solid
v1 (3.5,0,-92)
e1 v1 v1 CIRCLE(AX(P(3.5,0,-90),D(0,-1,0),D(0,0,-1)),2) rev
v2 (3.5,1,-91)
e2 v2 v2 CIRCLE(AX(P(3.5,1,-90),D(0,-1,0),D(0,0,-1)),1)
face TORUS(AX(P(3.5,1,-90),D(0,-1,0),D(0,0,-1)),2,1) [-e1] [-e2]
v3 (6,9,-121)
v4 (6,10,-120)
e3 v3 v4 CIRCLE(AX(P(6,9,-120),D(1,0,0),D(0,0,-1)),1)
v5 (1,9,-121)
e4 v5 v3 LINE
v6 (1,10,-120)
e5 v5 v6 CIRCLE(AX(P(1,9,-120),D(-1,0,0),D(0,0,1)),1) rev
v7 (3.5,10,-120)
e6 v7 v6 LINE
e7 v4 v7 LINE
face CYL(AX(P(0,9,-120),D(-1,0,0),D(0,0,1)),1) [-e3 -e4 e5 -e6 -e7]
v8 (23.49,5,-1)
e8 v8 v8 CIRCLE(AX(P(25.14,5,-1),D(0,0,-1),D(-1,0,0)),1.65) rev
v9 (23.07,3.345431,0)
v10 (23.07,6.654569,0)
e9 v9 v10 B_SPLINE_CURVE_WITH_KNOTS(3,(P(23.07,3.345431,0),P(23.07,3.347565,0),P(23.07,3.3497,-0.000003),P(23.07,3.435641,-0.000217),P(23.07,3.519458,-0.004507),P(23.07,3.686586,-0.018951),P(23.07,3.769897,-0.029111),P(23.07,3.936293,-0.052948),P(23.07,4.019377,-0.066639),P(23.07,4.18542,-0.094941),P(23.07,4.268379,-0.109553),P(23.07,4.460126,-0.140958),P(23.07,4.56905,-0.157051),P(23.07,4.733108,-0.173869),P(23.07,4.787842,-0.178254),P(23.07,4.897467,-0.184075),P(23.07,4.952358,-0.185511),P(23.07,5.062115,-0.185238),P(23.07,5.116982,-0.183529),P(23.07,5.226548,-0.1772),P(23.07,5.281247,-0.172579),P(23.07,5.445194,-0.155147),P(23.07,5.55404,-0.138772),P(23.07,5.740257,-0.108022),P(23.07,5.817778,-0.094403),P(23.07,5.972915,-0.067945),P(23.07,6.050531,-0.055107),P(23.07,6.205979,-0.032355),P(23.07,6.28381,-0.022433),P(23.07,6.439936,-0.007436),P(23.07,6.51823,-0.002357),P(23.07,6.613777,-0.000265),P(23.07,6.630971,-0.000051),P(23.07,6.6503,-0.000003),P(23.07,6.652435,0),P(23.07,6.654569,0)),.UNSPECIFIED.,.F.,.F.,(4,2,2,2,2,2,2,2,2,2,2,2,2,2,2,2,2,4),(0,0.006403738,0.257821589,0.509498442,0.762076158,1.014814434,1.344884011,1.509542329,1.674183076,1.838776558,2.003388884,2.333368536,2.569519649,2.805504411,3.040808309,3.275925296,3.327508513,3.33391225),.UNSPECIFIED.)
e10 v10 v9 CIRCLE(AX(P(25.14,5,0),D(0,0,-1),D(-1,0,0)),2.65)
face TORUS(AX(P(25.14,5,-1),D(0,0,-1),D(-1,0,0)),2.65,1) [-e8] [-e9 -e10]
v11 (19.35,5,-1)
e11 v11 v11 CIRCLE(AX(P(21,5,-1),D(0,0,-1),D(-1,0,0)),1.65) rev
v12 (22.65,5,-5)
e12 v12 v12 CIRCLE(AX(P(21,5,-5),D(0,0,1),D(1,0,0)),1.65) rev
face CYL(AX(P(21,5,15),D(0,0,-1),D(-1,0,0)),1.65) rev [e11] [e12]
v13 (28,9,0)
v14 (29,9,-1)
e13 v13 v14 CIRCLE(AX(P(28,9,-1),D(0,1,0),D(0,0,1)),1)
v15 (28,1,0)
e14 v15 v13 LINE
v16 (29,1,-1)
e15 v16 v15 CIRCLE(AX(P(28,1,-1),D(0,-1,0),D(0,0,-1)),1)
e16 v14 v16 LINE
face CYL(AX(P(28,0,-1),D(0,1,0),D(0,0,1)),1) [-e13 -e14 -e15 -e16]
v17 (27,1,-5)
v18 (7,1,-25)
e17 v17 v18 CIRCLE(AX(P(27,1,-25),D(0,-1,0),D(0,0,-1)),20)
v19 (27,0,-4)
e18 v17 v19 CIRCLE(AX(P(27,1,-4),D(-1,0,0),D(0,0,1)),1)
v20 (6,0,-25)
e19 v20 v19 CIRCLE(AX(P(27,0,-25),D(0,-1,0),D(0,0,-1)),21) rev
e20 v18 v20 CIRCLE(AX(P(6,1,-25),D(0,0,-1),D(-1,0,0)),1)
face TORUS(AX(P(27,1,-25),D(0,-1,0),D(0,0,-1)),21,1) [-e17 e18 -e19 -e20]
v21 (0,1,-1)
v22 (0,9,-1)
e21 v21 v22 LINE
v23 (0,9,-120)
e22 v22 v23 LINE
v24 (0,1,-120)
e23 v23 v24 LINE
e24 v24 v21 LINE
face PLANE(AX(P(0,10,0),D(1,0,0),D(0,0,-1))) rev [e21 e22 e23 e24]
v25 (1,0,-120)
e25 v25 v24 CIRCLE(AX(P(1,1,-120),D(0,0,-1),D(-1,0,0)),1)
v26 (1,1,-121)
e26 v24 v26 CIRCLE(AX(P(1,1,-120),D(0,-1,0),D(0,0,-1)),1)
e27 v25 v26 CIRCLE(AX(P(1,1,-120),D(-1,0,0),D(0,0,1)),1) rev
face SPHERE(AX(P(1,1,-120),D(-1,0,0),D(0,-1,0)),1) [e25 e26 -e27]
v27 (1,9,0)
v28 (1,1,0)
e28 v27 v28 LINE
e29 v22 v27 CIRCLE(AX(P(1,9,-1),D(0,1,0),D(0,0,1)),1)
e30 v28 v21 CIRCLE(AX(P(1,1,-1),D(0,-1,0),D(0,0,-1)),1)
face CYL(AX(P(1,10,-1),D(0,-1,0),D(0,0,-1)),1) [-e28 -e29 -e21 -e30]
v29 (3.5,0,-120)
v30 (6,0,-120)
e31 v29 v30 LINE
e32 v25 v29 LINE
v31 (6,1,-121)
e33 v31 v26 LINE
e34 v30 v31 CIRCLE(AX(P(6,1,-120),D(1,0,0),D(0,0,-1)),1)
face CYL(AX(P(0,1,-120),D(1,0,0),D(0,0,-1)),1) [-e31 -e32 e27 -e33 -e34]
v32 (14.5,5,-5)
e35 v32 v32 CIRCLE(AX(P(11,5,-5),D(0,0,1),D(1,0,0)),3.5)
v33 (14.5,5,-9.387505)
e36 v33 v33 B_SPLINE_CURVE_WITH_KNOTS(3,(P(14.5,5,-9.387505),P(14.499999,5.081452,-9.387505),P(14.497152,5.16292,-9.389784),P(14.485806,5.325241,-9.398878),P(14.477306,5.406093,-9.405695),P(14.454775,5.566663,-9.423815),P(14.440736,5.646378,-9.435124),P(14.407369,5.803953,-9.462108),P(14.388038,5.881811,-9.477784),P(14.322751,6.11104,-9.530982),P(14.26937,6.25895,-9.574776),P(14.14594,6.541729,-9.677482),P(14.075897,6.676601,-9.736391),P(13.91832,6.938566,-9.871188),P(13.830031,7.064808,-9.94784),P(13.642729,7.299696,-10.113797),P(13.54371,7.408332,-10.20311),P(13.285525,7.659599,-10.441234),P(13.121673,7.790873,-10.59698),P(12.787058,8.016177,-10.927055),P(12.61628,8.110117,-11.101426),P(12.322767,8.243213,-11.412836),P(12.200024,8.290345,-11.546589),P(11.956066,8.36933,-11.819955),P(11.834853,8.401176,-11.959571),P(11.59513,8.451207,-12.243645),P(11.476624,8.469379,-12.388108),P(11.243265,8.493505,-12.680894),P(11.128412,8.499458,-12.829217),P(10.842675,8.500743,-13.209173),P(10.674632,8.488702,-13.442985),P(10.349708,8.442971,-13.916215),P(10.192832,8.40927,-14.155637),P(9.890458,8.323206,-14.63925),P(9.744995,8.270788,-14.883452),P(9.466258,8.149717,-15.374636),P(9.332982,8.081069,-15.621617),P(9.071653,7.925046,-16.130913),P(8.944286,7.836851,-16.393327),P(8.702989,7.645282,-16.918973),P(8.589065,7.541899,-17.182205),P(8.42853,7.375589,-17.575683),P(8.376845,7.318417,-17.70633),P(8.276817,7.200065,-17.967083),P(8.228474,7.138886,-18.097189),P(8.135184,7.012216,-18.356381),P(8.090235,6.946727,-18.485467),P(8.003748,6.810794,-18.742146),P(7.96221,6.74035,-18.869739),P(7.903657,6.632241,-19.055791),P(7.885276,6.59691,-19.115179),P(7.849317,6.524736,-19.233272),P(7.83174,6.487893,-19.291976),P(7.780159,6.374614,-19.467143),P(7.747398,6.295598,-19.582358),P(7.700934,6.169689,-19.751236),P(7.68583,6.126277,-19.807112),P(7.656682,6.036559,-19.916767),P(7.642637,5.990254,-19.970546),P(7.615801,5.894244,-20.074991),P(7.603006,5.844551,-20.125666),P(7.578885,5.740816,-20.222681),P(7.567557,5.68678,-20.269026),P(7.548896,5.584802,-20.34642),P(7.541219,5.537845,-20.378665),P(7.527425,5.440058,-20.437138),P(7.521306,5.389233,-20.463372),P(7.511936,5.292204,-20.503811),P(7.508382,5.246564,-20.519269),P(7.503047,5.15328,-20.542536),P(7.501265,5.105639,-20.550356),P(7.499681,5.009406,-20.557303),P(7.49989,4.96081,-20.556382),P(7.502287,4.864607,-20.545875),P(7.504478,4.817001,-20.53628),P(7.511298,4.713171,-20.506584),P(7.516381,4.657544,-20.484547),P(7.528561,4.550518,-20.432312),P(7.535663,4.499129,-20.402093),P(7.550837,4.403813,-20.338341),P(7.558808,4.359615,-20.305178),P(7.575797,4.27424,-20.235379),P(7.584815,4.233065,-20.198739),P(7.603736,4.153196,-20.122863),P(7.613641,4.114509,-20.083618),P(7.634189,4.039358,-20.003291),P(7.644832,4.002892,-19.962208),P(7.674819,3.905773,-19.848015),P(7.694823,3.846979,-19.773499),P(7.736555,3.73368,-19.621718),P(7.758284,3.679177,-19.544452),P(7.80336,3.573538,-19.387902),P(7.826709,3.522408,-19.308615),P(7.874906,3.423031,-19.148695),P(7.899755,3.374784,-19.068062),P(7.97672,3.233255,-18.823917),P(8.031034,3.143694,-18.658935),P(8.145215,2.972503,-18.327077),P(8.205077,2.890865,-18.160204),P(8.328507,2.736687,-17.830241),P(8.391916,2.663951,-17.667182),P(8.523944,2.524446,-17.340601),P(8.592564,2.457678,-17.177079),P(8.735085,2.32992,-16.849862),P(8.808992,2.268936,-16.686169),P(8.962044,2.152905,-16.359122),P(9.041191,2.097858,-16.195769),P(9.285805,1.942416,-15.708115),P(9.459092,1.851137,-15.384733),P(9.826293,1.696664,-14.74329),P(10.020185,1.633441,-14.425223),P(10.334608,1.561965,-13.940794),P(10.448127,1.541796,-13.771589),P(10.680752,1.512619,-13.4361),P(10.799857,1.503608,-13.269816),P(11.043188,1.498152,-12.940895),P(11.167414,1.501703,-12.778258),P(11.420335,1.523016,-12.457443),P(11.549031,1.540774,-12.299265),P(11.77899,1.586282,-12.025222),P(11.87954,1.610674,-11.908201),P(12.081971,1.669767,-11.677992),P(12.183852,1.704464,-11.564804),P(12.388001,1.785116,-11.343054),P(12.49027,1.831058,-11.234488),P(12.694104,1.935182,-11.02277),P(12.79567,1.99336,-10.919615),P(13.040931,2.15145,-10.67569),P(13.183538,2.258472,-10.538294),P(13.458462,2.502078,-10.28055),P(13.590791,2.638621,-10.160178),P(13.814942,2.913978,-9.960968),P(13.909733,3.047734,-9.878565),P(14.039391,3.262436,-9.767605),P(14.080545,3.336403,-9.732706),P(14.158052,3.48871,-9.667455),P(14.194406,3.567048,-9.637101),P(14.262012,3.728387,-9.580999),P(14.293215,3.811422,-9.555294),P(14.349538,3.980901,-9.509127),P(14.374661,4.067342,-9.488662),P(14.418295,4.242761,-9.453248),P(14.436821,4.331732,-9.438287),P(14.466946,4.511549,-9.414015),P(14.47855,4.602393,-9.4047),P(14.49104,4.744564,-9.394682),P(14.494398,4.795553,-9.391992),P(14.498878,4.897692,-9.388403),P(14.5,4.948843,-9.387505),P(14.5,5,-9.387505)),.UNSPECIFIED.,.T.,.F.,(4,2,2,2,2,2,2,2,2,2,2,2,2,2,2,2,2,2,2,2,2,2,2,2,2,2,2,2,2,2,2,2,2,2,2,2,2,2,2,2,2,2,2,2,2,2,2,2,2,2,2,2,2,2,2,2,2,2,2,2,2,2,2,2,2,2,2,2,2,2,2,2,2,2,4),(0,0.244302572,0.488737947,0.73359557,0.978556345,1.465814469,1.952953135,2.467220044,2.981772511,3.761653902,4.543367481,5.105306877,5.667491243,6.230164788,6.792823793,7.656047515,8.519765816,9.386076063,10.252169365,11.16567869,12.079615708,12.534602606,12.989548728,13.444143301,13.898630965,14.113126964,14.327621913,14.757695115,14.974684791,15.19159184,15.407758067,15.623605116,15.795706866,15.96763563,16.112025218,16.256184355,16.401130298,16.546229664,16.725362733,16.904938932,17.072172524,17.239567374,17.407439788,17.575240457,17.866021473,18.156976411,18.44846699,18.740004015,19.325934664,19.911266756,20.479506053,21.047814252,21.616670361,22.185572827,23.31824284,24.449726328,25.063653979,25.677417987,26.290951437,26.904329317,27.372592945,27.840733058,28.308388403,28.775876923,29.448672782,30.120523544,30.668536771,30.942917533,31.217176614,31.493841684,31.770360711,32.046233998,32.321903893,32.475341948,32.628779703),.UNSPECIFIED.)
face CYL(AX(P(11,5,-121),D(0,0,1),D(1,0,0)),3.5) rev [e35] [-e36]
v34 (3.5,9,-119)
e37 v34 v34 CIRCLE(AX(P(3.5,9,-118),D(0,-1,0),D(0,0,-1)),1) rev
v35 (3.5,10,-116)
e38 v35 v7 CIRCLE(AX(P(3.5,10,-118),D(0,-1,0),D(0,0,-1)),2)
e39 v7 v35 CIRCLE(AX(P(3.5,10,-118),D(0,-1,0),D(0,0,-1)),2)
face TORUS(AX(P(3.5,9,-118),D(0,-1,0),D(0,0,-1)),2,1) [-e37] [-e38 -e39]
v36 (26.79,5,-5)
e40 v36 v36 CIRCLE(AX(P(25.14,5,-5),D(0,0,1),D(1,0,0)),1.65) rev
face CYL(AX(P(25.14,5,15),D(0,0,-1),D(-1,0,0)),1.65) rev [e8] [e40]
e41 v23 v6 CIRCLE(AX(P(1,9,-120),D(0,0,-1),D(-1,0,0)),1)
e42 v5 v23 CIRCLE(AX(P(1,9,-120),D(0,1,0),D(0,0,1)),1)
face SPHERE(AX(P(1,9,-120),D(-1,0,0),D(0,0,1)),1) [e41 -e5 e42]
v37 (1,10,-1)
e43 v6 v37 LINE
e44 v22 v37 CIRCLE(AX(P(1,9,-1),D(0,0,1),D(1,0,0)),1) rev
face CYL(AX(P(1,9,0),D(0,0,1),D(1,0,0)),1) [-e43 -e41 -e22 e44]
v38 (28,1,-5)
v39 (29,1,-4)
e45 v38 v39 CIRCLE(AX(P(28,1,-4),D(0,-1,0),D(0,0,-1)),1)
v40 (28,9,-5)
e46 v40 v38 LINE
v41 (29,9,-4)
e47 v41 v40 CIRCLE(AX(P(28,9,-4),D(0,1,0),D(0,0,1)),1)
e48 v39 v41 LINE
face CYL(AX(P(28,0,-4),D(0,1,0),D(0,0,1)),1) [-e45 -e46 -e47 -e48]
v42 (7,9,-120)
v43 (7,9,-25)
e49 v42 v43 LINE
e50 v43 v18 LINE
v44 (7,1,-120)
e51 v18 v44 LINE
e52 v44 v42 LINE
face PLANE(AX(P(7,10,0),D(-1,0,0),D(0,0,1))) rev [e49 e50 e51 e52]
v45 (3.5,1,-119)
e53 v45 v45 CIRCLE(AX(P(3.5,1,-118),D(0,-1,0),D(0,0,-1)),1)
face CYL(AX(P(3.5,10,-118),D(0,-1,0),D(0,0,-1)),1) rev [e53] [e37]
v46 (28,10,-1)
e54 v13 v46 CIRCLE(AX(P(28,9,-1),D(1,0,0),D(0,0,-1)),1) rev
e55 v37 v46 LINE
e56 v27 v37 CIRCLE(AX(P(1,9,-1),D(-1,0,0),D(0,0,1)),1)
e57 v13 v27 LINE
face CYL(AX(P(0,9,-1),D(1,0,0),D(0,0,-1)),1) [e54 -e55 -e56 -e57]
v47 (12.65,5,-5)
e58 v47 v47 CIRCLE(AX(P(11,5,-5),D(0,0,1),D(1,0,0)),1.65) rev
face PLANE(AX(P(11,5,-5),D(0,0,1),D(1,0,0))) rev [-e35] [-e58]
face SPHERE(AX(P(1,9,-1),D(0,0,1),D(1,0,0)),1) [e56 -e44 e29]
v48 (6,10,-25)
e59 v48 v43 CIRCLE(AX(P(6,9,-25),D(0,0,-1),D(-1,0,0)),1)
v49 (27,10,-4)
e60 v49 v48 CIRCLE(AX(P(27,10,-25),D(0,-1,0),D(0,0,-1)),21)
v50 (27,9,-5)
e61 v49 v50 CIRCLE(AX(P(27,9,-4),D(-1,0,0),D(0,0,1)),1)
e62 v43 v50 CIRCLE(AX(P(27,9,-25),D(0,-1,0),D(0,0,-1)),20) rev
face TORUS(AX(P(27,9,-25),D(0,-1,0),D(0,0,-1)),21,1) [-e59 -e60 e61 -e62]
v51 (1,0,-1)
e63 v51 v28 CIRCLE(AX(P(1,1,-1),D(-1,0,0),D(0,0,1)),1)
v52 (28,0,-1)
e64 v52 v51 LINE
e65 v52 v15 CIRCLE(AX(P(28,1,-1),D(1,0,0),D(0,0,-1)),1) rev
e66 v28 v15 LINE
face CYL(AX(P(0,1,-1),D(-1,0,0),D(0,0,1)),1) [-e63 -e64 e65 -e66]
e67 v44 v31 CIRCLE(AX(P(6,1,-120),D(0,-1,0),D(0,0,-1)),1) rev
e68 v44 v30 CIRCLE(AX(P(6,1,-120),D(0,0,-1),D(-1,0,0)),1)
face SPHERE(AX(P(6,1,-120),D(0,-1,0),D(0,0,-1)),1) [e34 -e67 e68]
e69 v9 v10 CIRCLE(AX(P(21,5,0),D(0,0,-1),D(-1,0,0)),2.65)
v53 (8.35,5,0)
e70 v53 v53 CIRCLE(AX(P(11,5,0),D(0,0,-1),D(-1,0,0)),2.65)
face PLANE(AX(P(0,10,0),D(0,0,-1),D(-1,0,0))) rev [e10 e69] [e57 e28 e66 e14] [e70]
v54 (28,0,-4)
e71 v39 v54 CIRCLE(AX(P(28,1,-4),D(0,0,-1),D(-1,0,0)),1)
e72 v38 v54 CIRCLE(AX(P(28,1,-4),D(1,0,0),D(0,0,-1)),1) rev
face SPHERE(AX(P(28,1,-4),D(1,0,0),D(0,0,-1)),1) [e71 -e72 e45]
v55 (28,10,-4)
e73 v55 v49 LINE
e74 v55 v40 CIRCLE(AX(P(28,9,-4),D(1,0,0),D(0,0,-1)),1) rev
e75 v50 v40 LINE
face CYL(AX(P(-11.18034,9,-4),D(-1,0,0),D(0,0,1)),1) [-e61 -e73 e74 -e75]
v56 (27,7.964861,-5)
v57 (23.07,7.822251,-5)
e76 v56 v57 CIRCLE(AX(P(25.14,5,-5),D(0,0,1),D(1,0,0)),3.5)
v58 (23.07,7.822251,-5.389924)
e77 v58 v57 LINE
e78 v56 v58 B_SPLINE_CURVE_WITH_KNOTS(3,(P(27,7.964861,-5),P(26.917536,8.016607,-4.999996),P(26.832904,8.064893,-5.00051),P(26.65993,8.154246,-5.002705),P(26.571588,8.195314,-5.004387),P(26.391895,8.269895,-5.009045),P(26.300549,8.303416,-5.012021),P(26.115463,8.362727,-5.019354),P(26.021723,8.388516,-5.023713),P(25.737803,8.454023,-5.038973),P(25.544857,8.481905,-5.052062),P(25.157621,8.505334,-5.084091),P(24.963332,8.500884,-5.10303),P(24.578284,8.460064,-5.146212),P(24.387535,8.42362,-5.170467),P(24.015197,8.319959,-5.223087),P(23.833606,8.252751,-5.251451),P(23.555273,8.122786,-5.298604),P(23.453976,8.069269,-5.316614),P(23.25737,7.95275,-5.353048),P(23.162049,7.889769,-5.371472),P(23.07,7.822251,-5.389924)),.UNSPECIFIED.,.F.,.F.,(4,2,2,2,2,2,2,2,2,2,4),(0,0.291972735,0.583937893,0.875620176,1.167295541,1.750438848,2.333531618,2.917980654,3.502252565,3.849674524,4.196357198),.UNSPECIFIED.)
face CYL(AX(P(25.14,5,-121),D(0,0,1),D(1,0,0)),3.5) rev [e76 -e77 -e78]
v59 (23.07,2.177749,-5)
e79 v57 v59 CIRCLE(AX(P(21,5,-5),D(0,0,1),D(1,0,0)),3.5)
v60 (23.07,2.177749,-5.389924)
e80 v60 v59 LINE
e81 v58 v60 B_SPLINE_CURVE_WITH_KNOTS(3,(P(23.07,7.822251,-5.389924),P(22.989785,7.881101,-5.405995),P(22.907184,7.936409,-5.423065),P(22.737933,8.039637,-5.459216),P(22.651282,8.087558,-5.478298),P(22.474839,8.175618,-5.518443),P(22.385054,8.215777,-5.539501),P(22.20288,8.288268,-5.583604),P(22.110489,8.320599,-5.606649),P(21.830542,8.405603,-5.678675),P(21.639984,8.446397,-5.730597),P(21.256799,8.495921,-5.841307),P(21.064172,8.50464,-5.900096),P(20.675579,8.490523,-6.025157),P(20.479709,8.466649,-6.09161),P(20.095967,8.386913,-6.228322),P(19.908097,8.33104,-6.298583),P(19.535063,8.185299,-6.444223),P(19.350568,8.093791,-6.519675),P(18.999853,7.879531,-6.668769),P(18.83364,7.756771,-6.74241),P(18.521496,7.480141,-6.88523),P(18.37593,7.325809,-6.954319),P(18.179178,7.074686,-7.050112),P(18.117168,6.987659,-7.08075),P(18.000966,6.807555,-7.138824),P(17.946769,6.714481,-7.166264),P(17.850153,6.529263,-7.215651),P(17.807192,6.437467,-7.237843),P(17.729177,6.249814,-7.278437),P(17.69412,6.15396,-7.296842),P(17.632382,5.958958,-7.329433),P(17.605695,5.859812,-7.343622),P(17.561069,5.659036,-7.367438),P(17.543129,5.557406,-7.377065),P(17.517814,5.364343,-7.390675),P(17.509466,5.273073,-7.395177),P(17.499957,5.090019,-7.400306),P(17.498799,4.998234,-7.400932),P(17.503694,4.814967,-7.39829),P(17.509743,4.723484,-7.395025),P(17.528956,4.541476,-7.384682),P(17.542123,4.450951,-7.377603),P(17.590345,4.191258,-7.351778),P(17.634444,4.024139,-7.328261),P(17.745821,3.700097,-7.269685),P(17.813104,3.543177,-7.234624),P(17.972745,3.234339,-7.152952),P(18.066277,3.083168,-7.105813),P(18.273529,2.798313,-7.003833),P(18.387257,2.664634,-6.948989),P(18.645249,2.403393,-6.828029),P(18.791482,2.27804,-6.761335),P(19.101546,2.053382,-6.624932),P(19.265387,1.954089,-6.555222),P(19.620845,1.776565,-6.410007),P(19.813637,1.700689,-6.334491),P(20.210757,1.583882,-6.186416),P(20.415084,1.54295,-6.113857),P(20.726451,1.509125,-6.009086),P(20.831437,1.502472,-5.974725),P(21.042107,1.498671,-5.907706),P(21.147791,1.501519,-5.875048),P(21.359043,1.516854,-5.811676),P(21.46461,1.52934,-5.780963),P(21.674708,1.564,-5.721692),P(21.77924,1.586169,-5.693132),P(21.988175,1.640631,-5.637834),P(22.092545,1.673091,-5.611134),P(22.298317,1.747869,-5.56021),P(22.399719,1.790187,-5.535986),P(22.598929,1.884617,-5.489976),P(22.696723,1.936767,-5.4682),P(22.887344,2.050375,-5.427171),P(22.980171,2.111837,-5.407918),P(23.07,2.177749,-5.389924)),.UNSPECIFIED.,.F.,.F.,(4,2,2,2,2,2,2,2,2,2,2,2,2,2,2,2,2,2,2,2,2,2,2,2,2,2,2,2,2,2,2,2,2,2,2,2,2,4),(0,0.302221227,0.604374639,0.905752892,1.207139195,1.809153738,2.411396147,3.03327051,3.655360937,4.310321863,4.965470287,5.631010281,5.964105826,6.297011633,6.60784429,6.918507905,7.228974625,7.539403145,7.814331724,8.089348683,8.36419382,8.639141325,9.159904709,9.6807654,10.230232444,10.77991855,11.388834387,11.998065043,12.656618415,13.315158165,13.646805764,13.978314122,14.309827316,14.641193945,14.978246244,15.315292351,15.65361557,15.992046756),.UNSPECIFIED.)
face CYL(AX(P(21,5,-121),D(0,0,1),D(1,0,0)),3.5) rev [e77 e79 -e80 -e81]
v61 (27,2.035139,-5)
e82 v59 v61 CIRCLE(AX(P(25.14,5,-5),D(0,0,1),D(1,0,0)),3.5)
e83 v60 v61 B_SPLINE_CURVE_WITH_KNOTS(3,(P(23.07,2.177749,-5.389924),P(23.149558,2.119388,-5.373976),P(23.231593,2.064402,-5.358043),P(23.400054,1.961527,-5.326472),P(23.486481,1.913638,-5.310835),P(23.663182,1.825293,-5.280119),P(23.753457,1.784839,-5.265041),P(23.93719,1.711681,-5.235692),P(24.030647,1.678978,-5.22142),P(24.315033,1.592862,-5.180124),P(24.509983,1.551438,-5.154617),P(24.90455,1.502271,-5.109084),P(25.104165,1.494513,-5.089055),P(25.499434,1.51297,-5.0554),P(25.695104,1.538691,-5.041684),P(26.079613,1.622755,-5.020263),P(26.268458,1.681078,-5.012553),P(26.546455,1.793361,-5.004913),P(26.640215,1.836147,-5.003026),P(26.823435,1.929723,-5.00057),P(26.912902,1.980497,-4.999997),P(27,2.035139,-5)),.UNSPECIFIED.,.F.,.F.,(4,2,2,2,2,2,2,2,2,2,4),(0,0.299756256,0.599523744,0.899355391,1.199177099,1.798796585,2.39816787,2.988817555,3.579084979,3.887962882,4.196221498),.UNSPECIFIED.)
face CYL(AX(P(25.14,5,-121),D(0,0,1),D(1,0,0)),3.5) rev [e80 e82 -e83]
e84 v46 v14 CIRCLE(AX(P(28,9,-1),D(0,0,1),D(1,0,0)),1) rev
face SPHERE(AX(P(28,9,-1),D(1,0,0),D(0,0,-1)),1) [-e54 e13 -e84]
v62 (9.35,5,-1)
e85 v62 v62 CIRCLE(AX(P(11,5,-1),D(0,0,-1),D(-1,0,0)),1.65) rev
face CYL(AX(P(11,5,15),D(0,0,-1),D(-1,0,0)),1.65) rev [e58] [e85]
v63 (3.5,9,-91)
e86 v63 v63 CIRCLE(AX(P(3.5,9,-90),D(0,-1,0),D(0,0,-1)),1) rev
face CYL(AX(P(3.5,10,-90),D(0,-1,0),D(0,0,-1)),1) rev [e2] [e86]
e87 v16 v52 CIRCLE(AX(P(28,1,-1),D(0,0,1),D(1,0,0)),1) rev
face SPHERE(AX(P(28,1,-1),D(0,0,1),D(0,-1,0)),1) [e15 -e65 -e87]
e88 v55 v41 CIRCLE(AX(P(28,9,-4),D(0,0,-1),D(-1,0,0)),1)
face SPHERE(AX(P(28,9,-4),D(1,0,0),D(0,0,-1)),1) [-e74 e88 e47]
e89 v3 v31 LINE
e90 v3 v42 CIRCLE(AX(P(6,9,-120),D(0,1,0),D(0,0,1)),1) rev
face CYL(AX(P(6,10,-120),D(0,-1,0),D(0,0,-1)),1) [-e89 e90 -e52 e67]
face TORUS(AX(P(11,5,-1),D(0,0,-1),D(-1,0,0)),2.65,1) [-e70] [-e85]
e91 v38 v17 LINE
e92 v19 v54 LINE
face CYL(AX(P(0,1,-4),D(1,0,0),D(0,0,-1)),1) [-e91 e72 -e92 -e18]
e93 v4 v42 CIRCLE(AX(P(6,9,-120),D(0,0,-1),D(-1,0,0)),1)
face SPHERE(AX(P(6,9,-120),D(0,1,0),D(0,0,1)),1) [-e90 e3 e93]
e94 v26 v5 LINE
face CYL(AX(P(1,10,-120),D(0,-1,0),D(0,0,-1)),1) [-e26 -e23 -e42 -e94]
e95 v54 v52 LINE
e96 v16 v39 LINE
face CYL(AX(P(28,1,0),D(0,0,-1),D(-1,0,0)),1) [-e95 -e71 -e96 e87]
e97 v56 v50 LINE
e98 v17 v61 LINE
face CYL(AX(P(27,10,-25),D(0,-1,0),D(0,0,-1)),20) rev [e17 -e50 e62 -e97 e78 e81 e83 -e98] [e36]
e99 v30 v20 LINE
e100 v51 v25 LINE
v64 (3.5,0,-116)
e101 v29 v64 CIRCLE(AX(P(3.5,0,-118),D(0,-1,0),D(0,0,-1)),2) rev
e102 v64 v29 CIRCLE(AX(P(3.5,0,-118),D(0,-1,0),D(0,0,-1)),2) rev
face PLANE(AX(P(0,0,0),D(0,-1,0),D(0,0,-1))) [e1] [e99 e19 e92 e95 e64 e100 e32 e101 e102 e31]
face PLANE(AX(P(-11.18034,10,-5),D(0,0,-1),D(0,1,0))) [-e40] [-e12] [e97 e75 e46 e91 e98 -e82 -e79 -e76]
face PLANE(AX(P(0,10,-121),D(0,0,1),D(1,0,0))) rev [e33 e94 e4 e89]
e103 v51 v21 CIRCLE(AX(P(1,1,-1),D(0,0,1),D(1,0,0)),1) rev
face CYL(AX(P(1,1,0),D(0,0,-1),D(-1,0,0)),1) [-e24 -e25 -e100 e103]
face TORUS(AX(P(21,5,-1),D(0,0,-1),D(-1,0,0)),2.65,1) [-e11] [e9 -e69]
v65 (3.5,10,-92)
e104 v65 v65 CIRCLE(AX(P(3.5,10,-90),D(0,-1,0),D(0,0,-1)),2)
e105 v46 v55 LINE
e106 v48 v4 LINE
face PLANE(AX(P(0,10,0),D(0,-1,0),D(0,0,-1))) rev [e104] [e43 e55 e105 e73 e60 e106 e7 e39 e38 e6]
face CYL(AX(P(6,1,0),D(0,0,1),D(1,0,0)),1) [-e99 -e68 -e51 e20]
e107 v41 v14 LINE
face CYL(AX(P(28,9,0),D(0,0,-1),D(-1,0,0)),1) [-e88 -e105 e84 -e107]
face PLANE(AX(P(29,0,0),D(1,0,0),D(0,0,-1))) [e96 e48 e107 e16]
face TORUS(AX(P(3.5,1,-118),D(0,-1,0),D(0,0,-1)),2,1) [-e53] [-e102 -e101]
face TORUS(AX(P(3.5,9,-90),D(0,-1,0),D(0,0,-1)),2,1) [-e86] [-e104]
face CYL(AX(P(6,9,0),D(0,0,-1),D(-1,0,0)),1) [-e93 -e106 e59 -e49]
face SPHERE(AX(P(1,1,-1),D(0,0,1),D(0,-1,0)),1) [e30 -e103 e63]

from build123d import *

# Parameters (mm, degrees)
SKETCH1_W                = 7
SKETCH1_H                = 121
SKETCH1_R                = 1
BOSS_EXTRUDE1_DEPTH      = 10
BOSS_EXTRUDE2_DEPTH      = 22
BOSS_EXTRUDE2_DEPTH_BACK = 7
SKETCH2_W                = 5
SKETCH2_H                = 10
SKETCH3_R                = 1.65
CUT_EXTRUDE1_DEPTH       = 20
FILLET1_R                = 20
FILLET2_R                = 1
SKETCH6_R                = 3.5
CUT_EXTRUDE3_DEPTH       = 120.987499349


with BuildPart() as part:
    # Sketch1 → Boss-Extrude1 (new body)
    with BuildSketch(Plane(origin=(0, 0, 0), x_dir=(1, 0, 0), z_dir=(0, 1, 0))):
        with Locations((3.5, 60.5)):
            Rectangle(SKETCH1_W, SKETCH1_H)
        with Locations(Location((3.5, 118, 0), (0, 0, 270))):
            Circle(SKETCH1_R, mode=Mode.SUBTRACT)
        with Locations(Location((3.5, 90, 0), (0, 0, 270))):
            Circle(SKETCH1_R, mode=Mode.SUBTRACT)
    extrude(amount=BOSS_EXTRUDE1_DEPTH)

    # Sketch2 → Boss-Extrude2 (add, two sides: drawn at the far end of the back side and taken through both)
    with BuildSketch(Plane(origin=(7, 0, 0), x_dir=(0, 0, -1), z_dir=(1, 0, 0)).offset(-BOSS_EXTRUDE2_DEPTH_BACK)):
        with Locations((2.5, 5)):
            Rectangle(SKETCH2_W, SKETCH2_H)
    extrude(amount=BOSS_EXTRUDE2_DEPTH + BOSS_EXTRUDE2_DEPTH_BACK)

    # Sketch3 → Cut-Extrude1 (cut)
    with BuildSketch(Plane(origin=(0, 0, -5), x_dir=(-1, 0, 0), z_dir=(0, 0, -1))):
        with Locations((-21, 5)):
            Circle(SKETCH3_R)
        with Locations((-11, 5)):
            Circle(SKETCH3_R)
        with Locations((-25.14, 5)):
            Circle(SKETCH3_R)
    extrude(amount=-CUT_EXTRUDE1_DEPTH, mode=Mode.SUBTRACT)

    # Fillet1
    # the kernel refuses this fillet: 20 mm, written as the material it adds along each edge
    with BuildSketch(Plane(origin=(7, 10, -5), x_dir=(1, 0, 0), z_dir=(0, -1, 0))) as fillet1_piece_1_section:
        with BuildLine():
            CenterArc((FILLET1_R, -FILLET1_R), FILLET1_R, 90, 90)
            Line((0, -FILLET1_R), (0, 0))
            Line((0, 0), (FILLET1_R, 0))
        make_face()
    fillet1_piece_1 = extrude(amount=10, mode=Mode.PRIVATE)
    fillet1_piece_1 = fillet1_piece_1 - Plane(origin=(11, 5, -10.788801803), x_dir=(-1, 0, 0), z_dir=(0, 0, -1)) * Cylinder(1.65, 100, mode=Mode.PRIVATE)
    fillet1_piece_1 = fillet1_piece_1 - Plane(origin=(21, 5, -10.788801803), x_dir=(-1, 0, 0), z_dir=(0, 0, -1)) * Cylinder(1.65, 100, mode=Mode.PRIVATE)
    fillet1_piece_1 = fillet1_piece_1 - Plane(origin=(25.14, 5, -10.788801803), x_dir=(-1, 0, 0), z_dir=(0, 0, -1)) * Cylinder(1.65, 100, mode=Mode.PRIVATE)
    add(fillet1_piece_1)

    # Fillet2
    # the kernel refuses this fillet: 1 mm, written as the material it takes off along each edge
    with BuildSketch(Plane(origin=(6, 9, -120), x_dir=(0, 1, 0), z_dir=(1, 0, 0))) as fillet2_piece_1_section:
        Polygon((0, 0), (FILLET2_R, 0), (FILLET2_R, -FILLET2_R), (0, -FILLET2_R), align=None)
    fillet2_piece_1 = extrude(amount=FILLET2_R, mode=Mode.PRIVATE)
    fillet2_piece_1 = fillet2_piece_1 - Plane(origin=(6, 9, -120), x_dir=(0, -0.7071067811865475, 0.7071067811865475), z_dir=(1, 0, 0)) * Sphere(FILLET2_R, mode=Mode.PRIVATE)
    add(fillet2_piece_1, mode=Mode.SUBTRACT)
    with BuildSketch(Plane(origin=(1, 9, -120), x_dir=(0, 1, 0), z_dir=(-1, 0, 0))) as fillet2_piece_2_section:
        Polygon((0, 0), (FILLET2_R, 0), (FILLET2_R, FILLET2_R), (0, FILLET2_R), align=None)
    fillet2_piece_2 = extrude(amount=FILLET2_R, mode=Mode.PRIVATE)
    fillet2_piece_2 = fillet2_piece_2 - Plane(origin=(1, 9, -120), x_dir=(0, -0.7071067811865475, 0.7071067811865475), z_dir=(-1, 0, 0)) * Sphere(FILLET2_R, mode=Mode.PRIVATE)
    add(fillet2_piece_2, mode=Mode.SUBTRACT)
    with BuildSketch(Plane(origin=(28, 1, -1), x_dir=(0, 0, 1), z_dir=(0, -1, 0))) as fillet2_piece_3_section:
        Polygon((0, 0), (FILLET2_R, 0), (FILLET2_R, -FILLET2_R), (0, -FILLET2_R), align=None)
    fillet2_piece_3 = extrude(amount=FILLET2_R, mode=Mode.PRIVATE)
    fillet2_piece_3 = fillet2_piece_3 - Plane(origin=(28, 1, -1), x_dir=(-0.7071067811865475, 0, -0.7071067811865476), z_dir=(0, -1, 0)) * Sphere(FILLET2_R, mode=Mode.PRIVATE)
    add(fillet2_piece_3, mode=Mode.SUBTRACT)
    with BuildSketch(Plane(origin=(28, 9, -1), x_dir=(1, 0, 0), z_dir=(0, 0, 1))) as fillet2_piece_4_section:
        Polygon((0, 0), (FILLET2_R, 0), (FILLET2_R, FILLET2_R), (0, FILLET2_R), align=None)
    fillet2_piece_4 = extrude(amount=FILLET2_R, mode=Mode.PRIVATE)
    fillet2_piece_4 = fillet2_piece_4 - Plane(origin=(28, 9, -1), x_dir=(-0.7071067811865475, -0.7071067811865475, 0), z_dir=(0, 0, 1)) * Sphere(FILLET2_R, mode=Mode.PRIVATE)
    add(fillet2_piece_4, mode=Mode.SUBTRACT)
    with BuildSketch(Plane(origin=(28, 1, -4), x_dir=(1, 0, 0), z_dir=(0, -1, 0))) as fillet2_piece_5_section:
        Polygon((0, 0), (FILLET2_R, 0), (FILLET2_R, -FILLET2_R), (0, -FILLET2_R), align=None)
    fillet2_piece_5 = extrude(amount=FILLET2_R, mode=Mode.PRIVATE)
    fillet2_piece_5 = fillet2_piece_5 - Plane(origin=(28, 1, -4), x_dir=(-0.7071067811865475, 0, 0.7071067811865475), z_dir=(0, -1, 0)) * Sphere(FILLET2_R, mode=Mode.PRIVATE)
    add(fillet2_piece_5, mode=Mode.SUBTRACT)
    with BuildSketch(Plane(origin=(28, 9, -4), x_dir=(0, 1, 0), z_dir=(1, 0, 0))) as fillet2_piece_6_section:
        Polygon((0, 0), (FILLET2_R, 0), (FILLET2_R, -FILLET2_R), (0, -FILLET2_R), align=None)
    fillet2_piece_6 = extrude(amount=FILLET2_R, mode=Mode.PRIVATE)
    fillet2_piece_6 = fillet2_piece_6 - Plane(origin=(28, 9, -4), x_dir=(0, -0.7071067811865477, 0.7071067811865475), z_dir=(1, 0, 0)) * Sphere(FILLET2_R, mode=Mode.PRIVATE)
    add(fillet2_piece_6, mode=Mode.SUBTRACT)
    with BuildSketch(Plane(origin=(1, 9, -1), x_dir=(-1, 0, 0), z_dir=(0, 0, 1))) as fillet2_piece_7_section:
        Polygon((0, 0), (FILLET2_R, 0), (FILLET2_R, -FILLET2_R), (0, -FILLET2_R), align=None)
    fillet2_piece_7 = extrude(amount=FILLET2_R, mode=Mode.PRIVATE)
    fillet2_piece_7 = fillet2_piece_7 - Plane(origin=(1, 9, -1), x_dir=(0.7071067811865475, -0.7071067811865475, 0), z_dir=(0, 0, 1)) * Sphere(FILLET2_R, mode=Mode.PRIVATE)
    add(fillet2_piece_7, mode=Mode.SUBTRACT)
    with BuildSketch(Plane(origin=(6, 1, -120), x_dir=(0, -1, 0), z_dir=(1, 0, 0))) as fillet2_piece_8_section:
        Polygon((0, 0), (FILLET2_R, 0), (FILLET2_R, FILLET2_R), (0, FILLET2_R), align=None)
    fillet2_piece_8 = extrude(amount=FILLET2_R, mode=Mode.PRIVATE)
    fillet2_piece_8 = fillet2_piece_8 - Plane(origin=(6, 1, -120), x_dir=(0, 0.7071067811865475, 0.7071067811865475), z_dir=(1, 0, 0)) * Sphere(FILLET2_R, mode=Mode.PRIVATE)
    add(fillet2_piece_8, mode=Mode.SUBTRACT)
    with BuildSketch(Plane(origin=(1, 1, -120), x_dir=(-1, 0, 0), z_dir=(0, -1, 0))) as fillet2_piece_9_section:
        Polygon((0, 0), (FILLET2_R, 0), (FILLET2_R, FILLET2_R), (0, FILLET2_R), align=None)
    fillet2_piece_9 = extrude(amount=FILLET2_R, mode=Mode.PRIVATE)
    fillet2_piece_9 = fillet2_piece_9 - Plane(origin=(1, 1, -120), x_dir=(0.7071067811865475, 0, 0.7071067811865475), z_dir=(0, -1, 0)) * Sphere(FILLET2_R, mode=Mode.PRIVATE)
    add(fillet2_piece_9, mode=Mode.SUBTRACT)
    with BuildSketch(Plane(origin=(1, 1, -1), x_dir=(0, 0, 1), z_dir=(0, -1, 0))) as fillet2_piece_10_section:
        Polygon((0, 0), (FILLET2_R, 0), (FILLET2_R, FILLET2_R), (0, FILLET2_R), align=None)
    fillet2_piece_10 = extrude(amount=FILLET2_R, mode=Mode.PRIVATE)
    fillet2_piece_10 = fillet2_piece_10 - Plane(origin=(1, 1, -1), x_dir=(0.7071067811865475, 0, -0.7071067811865475), z_dir=(0, -1, 0)) * Sphere(FILLET2_R, mode=Mode.PRIVATE)
    add(fillet2_piece_10, mode=Mode.SUBTRACT)
    with BuildSketch(Plane(origin=(3.5, 0, -118), x_dir=(0, 0, 1), z_dir=(-1, 0, 0))) as fillet2_piece_11:
        with BuildLine():
            CenterArc((1 + FILLET2_R, FILLET2_R), FILLET2_R, 180, 90)
            Line((1, FILLET2_R), (1, 0))
            Line((1, 0), (1 + FILLET2_R, 0))
        make_face()
    revolve(axis=Axis((3.5, 0, -118), (0, 1, 0)), mode=Mode.SUBTRACT)
    with BuildSketch(Plane(origin=(3.5, 10, -118), x_dir=(0, 0, 1), z_dir=(-1, 0, 0))) as fillet2_piece_12:
        with BuildLine():
            CenterArc((1 + FILLET2_R, -FILLET2_R), FILLET2_R, 90, 90)
            Line((1 + FILLET2_R, 0), (1, 0))
            Line((1, 0), (1, -FILLET2_R))
        make_face()
    revolve(axis=Axis((3.5, 10, -118), (0, 1, 0)), mode=Mode.SUBTRACT)
    with BuildSketch(Plane(origin=(3.5, 0, -90), x_dir=(0, 0, 1), z_dir=(-1, 0, 0))) as fillet2_piece_13:
        with BuildLine():
            CenterArc((1 + FILLET2_R, FILLET2_R), FILLET2_R, 180, 90)
            Line((1, FILLET2_R), (1, 0))
            Line((1, 0), (1 + FILLET2_R, 0))
        make_face()
    revolve(axis=Axis((3.5, 0, -90), (0, 1, 0)), mode=Mode.SUBTRACT)
    with BuildSketch(Plane(origin=(3.5, 10, -90), x_dir=(0, 0, 1), z_dir=(-1, 0, 0))) as fillet2_piece_14:
        with BuildLine():
            CenterArc((1 + FILLET2_R, -FILLET2_R), FILLET2_R, 90, 90)
            Line((1 + FILLET2_R, 0), (1, 0))
            Line((1, 0), (1, -FILLET2_R))
        make_face()
    revolve(axis=Axis((3.5, 10, -90), (0, 1, 0)), mode=Mode.SUBTRACT)
    with BuildSketch(Plane(origin=(6, 10, -121), x_dir=(0, -1, 0), z_dir=(-1, 0, 0))) as fillet2_piece_15:
        with BuildLine():
            CenterArc((FILLET2_R, FILLET2_R), FILLET2_R, 180, 90)
            Line((0, FILLET2_R), (0, 0))
            Line((0, 0), (FILLET2_R, 0))
        make_face()
    extrude(amount=5, mode=Mode.SUBTRACT)
    with BuildSketch(Plane(origin=(29, 1, 0), x_dir=(-1, 0, 0), z_dir=(0, 1, 0))) as fillet2_piece_16:
        with BuildLine():
            CenterArc((FILLET2_R, -FILLET2_R), FILLET2_R, 90, 90)
            Line((0, -FILLET2_R), (0, 0))
            Line((0, 0), (FILLET2_R, 0))
        make_face()
    extrude(amount=8, mode=Mode.SUBTRACT)
    with BuildSketch(Plane(origin=(29, 0, -4), x_dir=(0, 1, 0), z_dir=(0, 0, 1)), Plane(origin=(29, 10, -1), x_dir=(0, -1, 0), z_dir=(0, 0, -1))) as fillet2_piece_17:
        with BuildLine():
            CenterArc((FILLET2_R, FILLET2_R), FILLET2_R, 180, 90)
            Line((0, FILLET2_R), (0, 0))
            Line((0, 0), (FILLET2_R, 0))
        make_face()
    extrude(amount=3, mode=Mode.SUBTRACT)
    with BuildSketch(Plane(origin=(29, 9, -5), x_dir=(0, 0, 1), z_dir=(0, -1, 0)), Plane(origin=(0, 1, -121), x_dir=(0, 0, 1), z_dir=(0, 1, 0)), Plane(origin=(7, 1, -121), x_dir=(-1, 0, 0), z_dir=(0, 1, 0)), Plane(origin=(0, 1, 0), x_dir=(1, 0, 0), z_dir=(0, 1, 0))) as fillet2_piece_18:
        with BuildLine():
            CenterArc((FILLET2_R, FILLET2_R), FILLET2_R, 180, 90)
            Line((0, FILLET2_R), (0, 0))
            Line((0, 0), (FILLET2_R, 0))
        make_face()
    extrude(amount=8, mode=Mode.SUBTRACT)
    with BuildSketch(Plane(origin=(25.14, 5, 0), x_dir=(-1, 0, 0), z_dir=(0, -1, 0))) as fillet2_piece_19:
        with BuildLine():
            CenterArc((1.65 + FILLET2_R, FILLET2_R), FILLET2_R, 180, 90)
            Line((1.65 + FILLET2_R, 0), (1.65, 0))
            Line((1.65, 0), (1.65, FILLET2_R))
        make_face()
    revolve(axis=Axis((25.14, 5, 0), (0, 0, -1)), mode=Mode.SUBTRACT)
    with BuildSketch(Plane(origin=(0, 10, -1), x_dir=(0, -1, 0), z_dir=(0, 0, -1)), Plane(origin=(0, 0, -120), x_dir=(0, 1, 0), z_dir=(0, 0, 1))) as fillet2_piece_20:
        with BuildLine():
            CenterArc((FILLET2_R, -FILLET2_R), FILLET2_R, 90, 90)
            Line((0, -FILLET2_R), (0, 0))
            Line((0, 0), (FILLET2_R, 0))
        make_face()
    extrude(amount=119, mode=Mode.SUBTRACT)
    with BuildSketch(Plane(origin=(6, 0, -121), x_dir=(0, 1, 0), z_dir=(-1, 0, 0))) as fillet2_piece_21:
        with BuildLine():
            CenterArc((FILLET2_R, -FILLET2_R), FILLET2_R, 90, 90)
            Line((0, -FILLET2_R), (0, 0))
            Line((0, 0), (FILLET2_R, 0))
        make_face()
    extrude(amount=5, mode=Mode.SUBTRACT)
    with BuildSketch(Plane(origin=(11, 5, 0), x_dir=(-1, 0, 0), z_dir=(0, -1, 0))) as fillet2_piece_22:
        with BuildLine():
            CenterArc((1.65 + FILLET2_R, FILLET2_R), FILLET2_R, 180, 90)
            Line((1.65, FILLET2_R), (1.65, 0))
            Line((1.65, 0), (1.65 + FILLET2_R, 0))
        make_face()
    revolve(axis=Axis((11, 5, 0), (0, 0, -1)), mode=Mode.SUBTRACT)
    with BuildSketch(Plane(origin=(21, 5, 0), x_dir=(-1, 0, 0), z_dir=(0, -1, 0))) as fillet2_piece_23:
        with BuildLine():
            CenterArc((1.65 + FILLET2_R, FILLET2_R), FILLET2_R, 180, 90)
            Line((1.65, FILLET2_R), (1.65, 0))
            Line((1.65, 0), (1.65 + FILLET2_R, 0))
        make_face()
    revolve(axis=Axis((21, 5, 0), (0, 0, -1)), mode=Mode.SUBTRACT)
    with BuildSketch(Plane(origin=(1, 0, 0), x_dir=(0, 1, 0), z_dir=(1, 0, 0)), Plane(origin=(28, 10, 0), x_dir=(0, -1, 0), z_dir=(-1, 0, 0))) as fillet2_piece_24:
        with BuildLine():
            CenterArc((FILLET2_R, -FILLET2_R), FILLET2_R, 90, 90)
            Line((0, -FILLET2_R), (0, 0))
            Line((0, 0), (FILLET2_R, 0))
        make_face()
    extrude(amount=27, mode=Mode.SUBTRACT)
    with BuildSketch(Plane(origin=(7, 10, -25), x_dir=(0, -1, 0), z_dir=(0, 0, -1))) as fillet2_piece_25:
        with BuildLine():
            CenterArc((FILLET2_R, FILLET2_R), FILLET2_R, 180, 90)
            Line((0, FILLET2_R), (0, 0))
            Line((0, 0), (FILLET2_R, 0))
        make_face()
    extrude(amount=95, mode=Mode.SUBTRACT)
    with BuildSketch(Plane(origin=(7, 0, -25), x_dir=(0, 1, 0), z_dir=(0, 0, -1))) as fillet2_piece_26:
        with BuildLine():
            CenterArc((FILLET2_R, -FILLET2_R), FILLET2_R, 90, 90)
            Line((0, -FILLET2_R), (0, 0))
            Line((0, 0), (FILLET2_R, 0))
        make_face()
    extrude(amount=95, mode=Mode.SUBTRACT)
    with BuildSketch(Plane(origin=(28, 10, -5), x_dir=(0, 0, 1), z_dir=(-1, 0, 0))) as fillet2_piece_27:
        with BuildLine():
            CenterArc((FILLET2_R, -FILLET2_R), FILLET2_R, 90, 90)
            Line((0, -FILLET2_R), (0, 0))
            Line((0, 0), (FILLET2_R, 0))
        make_face()
    extrude(amount=1, mode=Mode.SUBTRACT)
    with BuildSketch(Plane(origin=(28, 0, -5), x_dir=(0, 0, 1), z_dir=(-1, 0, 0))) as fillet2_piece_28:
        with BuildLine():
            CenterArc((FILLET2_R, FILLET2_R), FILLET2_R, 180, 90)
            Line((0, FILLET2_R), (0, 0))
            Line((0, 0), (FILLET2_R, 0))
        make_face()
    extrude(amount=1, mode=Mode.SUBTRACT)
    with BuildSketch(Plane(origin=(27, 0, -25), x_dir=(0, 0, 1), z_dir=(1, 0, 0))) as fillet2_piece_29:
        with BuildLine():
            CenterArc((20 + FILLET2_R, -FILLET2_R), FILLET2_R, 90, 90)
            Line((20 + FILLET2_R, 0), (20, 0))
            Line((20, 0), (20, -FILLET2_R))
        make_face()
    revolve(axis=Axis((27, 0, -25), (0, -1, 0)), revolution_arc=90, mode=Mode.SUBTRACT)
    with BuildSketch(Plane(origin=(27, 10, -25), x_dir=(0, 0, 1), z_dir=(1, 0, 0))) as fillet2_piece_30:
        with BuildLine():
            CenterArc((20 + FILLET2_R, FILLET2_R), FILLET2_R, 180, 90)
            Line((20 + FILLET2_R, 0), (20, 0))
            Line((20, 0), (20, FILLET2_R))
        make_face()
    revolve(axis=Axis((27, 10, -25), (0, -1, 0)), revolution_arc=90, mode=Mode.SUBTRACT)

    # Sketch6 → Cut-Extrude3 (cut, through all)
    with BuildSketch(Plane.XY.offset(-5)):
        with Locations((11, 5)):
            Circle(SKETCH6_R)
        with BuildLine():
            ThreePointArc((23.07, 7.822250875), (17.5, 5), (23.07, 2.177749125))
            ThreePointArc((23.07, 2.177749125), (28.64, 5), (23.07, 7.822250875))
        make_face()
    extrude(amount=-CUT_EXTRUDE3_DEPTH, mode=Mode.SUBTRACT)


solid = part.part
